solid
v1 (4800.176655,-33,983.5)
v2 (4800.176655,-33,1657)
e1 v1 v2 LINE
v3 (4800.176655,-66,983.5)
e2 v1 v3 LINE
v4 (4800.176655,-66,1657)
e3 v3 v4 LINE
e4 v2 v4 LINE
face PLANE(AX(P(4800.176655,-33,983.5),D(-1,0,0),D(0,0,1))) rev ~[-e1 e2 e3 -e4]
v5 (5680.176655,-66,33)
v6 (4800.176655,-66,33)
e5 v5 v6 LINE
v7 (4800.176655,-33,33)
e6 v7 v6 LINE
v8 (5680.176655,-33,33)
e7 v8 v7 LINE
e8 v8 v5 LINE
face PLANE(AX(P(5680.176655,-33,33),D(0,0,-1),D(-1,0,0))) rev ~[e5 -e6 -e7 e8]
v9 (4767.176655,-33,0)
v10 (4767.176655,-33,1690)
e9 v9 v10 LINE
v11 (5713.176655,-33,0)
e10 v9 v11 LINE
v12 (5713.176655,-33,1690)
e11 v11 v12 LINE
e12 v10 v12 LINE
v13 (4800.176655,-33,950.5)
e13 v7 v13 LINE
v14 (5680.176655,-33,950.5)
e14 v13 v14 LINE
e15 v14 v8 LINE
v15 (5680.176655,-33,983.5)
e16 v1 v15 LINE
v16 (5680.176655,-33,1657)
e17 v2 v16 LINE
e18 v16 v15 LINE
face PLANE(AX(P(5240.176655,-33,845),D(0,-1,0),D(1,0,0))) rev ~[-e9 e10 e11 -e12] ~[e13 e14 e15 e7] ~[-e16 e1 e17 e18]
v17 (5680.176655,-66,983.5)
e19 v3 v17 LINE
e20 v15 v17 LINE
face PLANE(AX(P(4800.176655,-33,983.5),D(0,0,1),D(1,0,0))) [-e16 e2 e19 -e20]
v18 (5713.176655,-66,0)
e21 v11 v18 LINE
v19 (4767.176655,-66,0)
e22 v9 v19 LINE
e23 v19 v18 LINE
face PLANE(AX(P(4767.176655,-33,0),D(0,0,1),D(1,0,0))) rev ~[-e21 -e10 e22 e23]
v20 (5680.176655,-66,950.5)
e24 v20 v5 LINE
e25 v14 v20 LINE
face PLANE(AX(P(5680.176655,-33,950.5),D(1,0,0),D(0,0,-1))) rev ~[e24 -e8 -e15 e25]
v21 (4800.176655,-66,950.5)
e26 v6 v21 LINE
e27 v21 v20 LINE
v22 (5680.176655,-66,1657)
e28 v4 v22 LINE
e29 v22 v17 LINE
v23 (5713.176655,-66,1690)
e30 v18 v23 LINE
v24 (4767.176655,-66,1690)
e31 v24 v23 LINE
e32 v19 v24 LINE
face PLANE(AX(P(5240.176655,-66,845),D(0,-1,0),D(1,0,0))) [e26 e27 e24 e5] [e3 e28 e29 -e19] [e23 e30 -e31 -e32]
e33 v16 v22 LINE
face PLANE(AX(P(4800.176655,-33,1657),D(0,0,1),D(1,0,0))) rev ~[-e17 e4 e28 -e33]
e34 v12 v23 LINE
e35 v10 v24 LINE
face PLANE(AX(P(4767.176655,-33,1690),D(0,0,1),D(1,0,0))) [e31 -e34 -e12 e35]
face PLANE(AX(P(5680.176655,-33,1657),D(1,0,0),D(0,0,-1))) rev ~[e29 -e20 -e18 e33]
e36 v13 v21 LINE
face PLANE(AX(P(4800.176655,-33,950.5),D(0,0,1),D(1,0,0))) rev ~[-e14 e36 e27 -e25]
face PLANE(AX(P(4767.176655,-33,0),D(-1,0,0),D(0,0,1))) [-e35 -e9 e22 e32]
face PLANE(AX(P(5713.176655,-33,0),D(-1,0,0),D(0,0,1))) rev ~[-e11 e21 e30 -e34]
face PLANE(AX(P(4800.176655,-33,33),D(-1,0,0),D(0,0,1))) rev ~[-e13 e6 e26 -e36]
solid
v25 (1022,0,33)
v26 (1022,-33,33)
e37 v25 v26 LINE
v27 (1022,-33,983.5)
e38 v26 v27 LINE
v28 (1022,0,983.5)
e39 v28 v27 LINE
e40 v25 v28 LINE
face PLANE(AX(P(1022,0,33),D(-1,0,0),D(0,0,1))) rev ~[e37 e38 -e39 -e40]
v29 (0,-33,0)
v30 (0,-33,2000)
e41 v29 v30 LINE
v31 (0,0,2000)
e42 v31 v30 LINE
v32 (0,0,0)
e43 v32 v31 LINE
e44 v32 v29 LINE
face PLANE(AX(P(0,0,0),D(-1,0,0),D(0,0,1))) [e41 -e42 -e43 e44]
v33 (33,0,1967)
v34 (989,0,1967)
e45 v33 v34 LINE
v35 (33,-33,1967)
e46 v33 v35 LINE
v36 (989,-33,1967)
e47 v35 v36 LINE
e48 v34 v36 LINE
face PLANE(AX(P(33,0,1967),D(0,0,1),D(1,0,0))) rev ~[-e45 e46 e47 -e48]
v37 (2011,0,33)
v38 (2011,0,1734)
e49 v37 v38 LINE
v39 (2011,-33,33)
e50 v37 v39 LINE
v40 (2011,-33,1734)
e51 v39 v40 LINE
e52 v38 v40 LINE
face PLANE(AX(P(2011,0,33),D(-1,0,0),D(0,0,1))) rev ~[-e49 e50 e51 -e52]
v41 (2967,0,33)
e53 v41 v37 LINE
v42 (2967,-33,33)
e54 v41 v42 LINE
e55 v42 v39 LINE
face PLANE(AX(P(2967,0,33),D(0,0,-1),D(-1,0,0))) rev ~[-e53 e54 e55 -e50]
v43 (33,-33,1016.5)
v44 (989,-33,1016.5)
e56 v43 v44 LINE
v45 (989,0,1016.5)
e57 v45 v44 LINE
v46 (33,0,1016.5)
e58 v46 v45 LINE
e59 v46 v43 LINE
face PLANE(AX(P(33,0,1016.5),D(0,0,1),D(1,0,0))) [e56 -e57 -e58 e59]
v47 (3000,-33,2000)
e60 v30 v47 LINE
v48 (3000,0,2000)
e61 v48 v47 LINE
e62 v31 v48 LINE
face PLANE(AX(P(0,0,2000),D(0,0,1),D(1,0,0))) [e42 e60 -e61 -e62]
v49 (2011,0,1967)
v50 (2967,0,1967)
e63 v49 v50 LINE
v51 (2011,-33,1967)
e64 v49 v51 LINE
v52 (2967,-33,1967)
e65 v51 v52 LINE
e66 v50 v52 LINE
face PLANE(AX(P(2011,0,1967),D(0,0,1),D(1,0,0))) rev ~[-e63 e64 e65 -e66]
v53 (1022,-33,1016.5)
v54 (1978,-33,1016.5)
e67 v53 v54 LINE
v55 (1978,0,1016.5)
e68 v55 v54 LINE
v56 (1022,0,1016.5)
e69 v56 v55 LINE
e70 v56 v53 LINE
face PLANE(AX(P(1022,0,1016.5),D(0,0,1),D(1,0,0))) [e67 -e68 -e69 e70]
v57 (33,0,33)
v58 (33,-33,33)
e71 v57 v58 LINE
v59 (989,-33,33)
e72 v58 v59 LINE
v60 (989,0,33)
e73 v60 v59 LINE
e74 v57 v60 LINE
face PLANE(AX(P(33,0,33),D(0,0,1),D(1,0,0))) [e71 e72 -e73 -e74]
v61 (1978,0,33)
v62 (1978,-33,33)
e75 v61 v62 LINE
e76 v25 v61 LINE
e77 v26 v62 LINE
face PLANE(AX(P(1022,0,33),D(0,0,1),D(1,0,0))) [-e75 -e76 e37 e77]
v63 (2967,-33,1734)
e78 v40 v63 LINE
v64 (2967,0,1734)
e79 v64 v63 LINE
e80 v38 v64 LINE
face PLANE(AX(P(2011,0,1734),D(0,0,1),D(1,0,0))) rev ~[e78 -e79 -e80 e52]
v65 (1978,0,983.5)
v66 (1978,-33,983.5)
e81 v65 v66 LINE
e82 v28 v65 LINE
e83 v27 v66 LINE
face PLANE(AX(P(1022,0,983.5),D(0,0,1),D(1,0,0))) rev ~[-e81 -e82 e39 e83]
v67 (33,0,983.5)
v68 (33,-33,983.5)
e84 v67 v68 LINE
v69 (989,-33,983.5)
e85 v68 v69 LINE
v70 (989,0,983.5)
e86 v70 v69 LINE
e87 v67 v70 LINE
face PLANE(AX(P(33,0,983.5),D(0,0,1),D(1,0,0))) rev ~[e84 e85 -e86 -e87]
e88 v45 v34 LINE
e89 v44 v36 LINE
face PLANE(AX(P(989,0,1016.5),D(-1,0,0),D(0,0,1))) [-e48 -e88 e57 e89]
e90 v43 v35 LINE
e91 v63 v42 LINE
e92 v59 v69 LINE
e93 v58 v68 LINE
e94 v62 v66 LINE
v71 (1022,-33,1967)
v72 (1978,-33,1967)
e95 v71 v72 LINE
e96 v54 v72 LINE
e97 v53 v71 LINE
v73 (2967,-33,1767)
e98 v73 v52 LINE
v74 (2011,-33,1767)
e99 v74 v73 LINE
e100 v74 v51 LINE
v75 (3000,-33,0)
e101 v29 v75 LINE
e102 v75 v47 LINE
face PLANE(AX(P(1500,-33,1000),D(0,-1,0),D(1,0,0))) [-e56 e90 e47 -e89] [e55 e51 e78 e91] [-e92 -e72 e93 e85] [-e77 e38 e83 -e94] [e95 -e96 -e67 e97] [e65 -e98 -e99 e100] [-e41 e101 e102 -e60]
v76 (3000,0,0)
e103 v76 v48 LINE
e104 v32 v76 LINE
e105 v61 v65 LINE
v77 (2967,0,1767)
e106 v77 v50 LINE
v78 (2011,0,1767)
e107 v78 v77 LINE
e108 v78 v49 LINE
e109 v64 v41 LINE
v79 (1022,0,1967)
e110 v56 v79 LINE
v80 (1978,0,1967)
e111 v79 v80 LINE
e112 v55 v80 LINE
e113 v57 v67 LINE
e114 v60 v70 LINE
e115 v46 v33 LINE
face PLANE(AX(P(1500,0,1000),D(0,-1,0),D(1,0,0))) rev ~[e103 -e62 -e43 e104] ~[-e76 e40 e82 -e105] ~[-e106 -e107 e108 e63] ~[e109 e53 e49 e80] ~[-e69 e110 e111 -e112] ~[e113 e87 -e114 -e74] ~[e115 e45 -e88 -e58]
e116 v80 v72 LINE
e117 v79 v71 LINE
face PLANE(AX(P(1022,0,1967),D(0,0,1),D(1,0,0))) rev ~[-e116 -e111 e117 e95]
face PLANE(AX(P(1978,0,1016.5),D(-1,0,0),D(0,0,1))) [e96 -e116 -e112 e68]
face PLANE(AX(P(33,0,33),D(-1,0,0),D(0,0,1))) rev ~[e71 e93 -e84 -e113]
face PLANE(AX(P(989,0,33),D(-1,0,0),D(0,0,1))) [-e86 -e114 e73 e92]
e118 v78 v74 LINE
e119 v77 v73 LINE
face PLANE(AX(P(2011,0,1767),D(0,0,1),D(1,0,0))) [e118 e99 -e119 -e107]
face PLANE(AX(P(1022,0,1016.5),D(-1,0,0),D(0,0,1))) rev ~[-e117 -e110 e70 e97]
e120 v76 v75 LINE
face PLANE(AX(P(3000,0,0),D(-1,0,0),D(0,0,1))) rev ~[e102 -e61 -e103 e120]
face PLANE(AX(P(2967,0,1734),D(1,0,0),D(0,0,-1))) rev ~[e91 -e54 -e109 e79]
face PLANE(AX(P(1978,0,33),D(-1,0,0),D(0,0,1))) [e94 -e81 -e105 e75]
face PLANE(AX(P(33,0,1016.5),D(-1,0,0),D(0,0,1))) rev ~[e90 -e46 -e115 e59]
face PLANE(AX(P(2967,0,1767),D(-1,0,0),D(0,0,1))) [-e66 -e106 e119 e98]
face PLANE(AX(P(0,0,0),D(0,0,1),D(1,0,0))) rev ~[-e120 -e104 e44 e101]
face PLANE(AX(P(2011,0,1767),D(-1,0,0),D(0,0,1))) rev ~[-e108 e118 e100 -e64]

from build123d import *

# Parameters (mm, degrees)
F0_W     = 3000
F0_H     = 2000
F0_W_2   = 956
F0_H_2   = 950.5
F0_H_3   = 200
F1_DEPTH = 33
F2_W     = 946
F2_H     = 1690
F2_W_2   = 880
F2_H_2   = 33
F3_DEPTH = 33


# Not quite as in the source:
# - a feature names something its author has since deleted; it is built from what else it names


with BuildPart() as f1:
    # F0 (on Front) → F1 (new body)
    with BuildSketch(Plane.XZ):
        with Locations((1500, 1000)):
            Rectangle(F0_W, F0_H)
        with Locations((511, 508.25)):
            Rectangle(F0_W_2, F0_H_2, mode=Mode.SUBTRACT)
        with Locations((1500, 508.25)):
            Rectangle(F0_W_2, F0_H_2, mode=Mode.SUBTRACT)
        Polygon((2967, 33), (2011, 33), (2011, 1734), (2967, 1734), (2967, 1016.5), (2967, 983.5), align=None, mode=Mode.SUBTRACT)
        with Locations((511, 1491.75)):
            Rectangle(F0_W_2, F0_H_2, mode=Mode.SUBTRACT)
        with Locations((1500, 1491.75)):
            Rectangle(F0_W_2, F0_H_2, mode=Mode.SUBTRACT)
        with Locations((2489, 1867)):
            Rectangle(F0_W_2, F0_H_3, mode=Mode.SUBTRACT)
    extrude(amount=F1_DEPTH)


with BuildPart() as f3:
    # F2 (on face) → F3 (new body)
    with BuildSketch(Plane.XZ.offset(33)):
        with Locations((5240.176655467, 845)):
            Rectangle(F2_W, F2_H)
        Polygon((4800.176655467, 983.5), (4800.176655467, 1657), (5680.176655467, 1657), (5680.176655467, 983.5), (5680.176655467, 950.5), (5680.176655467, 33), (4800.176655467, 33), (4800.176655467, 950.5), align=None, mode=Mode.SUBTRACT)
        with Locations((5240.176655467, 967)):
            Rectangle(F2_W_2, F2_H_2)
    extrude(amount=F3_DEPTH)


solid = Compound([f1.part, f3.part])
